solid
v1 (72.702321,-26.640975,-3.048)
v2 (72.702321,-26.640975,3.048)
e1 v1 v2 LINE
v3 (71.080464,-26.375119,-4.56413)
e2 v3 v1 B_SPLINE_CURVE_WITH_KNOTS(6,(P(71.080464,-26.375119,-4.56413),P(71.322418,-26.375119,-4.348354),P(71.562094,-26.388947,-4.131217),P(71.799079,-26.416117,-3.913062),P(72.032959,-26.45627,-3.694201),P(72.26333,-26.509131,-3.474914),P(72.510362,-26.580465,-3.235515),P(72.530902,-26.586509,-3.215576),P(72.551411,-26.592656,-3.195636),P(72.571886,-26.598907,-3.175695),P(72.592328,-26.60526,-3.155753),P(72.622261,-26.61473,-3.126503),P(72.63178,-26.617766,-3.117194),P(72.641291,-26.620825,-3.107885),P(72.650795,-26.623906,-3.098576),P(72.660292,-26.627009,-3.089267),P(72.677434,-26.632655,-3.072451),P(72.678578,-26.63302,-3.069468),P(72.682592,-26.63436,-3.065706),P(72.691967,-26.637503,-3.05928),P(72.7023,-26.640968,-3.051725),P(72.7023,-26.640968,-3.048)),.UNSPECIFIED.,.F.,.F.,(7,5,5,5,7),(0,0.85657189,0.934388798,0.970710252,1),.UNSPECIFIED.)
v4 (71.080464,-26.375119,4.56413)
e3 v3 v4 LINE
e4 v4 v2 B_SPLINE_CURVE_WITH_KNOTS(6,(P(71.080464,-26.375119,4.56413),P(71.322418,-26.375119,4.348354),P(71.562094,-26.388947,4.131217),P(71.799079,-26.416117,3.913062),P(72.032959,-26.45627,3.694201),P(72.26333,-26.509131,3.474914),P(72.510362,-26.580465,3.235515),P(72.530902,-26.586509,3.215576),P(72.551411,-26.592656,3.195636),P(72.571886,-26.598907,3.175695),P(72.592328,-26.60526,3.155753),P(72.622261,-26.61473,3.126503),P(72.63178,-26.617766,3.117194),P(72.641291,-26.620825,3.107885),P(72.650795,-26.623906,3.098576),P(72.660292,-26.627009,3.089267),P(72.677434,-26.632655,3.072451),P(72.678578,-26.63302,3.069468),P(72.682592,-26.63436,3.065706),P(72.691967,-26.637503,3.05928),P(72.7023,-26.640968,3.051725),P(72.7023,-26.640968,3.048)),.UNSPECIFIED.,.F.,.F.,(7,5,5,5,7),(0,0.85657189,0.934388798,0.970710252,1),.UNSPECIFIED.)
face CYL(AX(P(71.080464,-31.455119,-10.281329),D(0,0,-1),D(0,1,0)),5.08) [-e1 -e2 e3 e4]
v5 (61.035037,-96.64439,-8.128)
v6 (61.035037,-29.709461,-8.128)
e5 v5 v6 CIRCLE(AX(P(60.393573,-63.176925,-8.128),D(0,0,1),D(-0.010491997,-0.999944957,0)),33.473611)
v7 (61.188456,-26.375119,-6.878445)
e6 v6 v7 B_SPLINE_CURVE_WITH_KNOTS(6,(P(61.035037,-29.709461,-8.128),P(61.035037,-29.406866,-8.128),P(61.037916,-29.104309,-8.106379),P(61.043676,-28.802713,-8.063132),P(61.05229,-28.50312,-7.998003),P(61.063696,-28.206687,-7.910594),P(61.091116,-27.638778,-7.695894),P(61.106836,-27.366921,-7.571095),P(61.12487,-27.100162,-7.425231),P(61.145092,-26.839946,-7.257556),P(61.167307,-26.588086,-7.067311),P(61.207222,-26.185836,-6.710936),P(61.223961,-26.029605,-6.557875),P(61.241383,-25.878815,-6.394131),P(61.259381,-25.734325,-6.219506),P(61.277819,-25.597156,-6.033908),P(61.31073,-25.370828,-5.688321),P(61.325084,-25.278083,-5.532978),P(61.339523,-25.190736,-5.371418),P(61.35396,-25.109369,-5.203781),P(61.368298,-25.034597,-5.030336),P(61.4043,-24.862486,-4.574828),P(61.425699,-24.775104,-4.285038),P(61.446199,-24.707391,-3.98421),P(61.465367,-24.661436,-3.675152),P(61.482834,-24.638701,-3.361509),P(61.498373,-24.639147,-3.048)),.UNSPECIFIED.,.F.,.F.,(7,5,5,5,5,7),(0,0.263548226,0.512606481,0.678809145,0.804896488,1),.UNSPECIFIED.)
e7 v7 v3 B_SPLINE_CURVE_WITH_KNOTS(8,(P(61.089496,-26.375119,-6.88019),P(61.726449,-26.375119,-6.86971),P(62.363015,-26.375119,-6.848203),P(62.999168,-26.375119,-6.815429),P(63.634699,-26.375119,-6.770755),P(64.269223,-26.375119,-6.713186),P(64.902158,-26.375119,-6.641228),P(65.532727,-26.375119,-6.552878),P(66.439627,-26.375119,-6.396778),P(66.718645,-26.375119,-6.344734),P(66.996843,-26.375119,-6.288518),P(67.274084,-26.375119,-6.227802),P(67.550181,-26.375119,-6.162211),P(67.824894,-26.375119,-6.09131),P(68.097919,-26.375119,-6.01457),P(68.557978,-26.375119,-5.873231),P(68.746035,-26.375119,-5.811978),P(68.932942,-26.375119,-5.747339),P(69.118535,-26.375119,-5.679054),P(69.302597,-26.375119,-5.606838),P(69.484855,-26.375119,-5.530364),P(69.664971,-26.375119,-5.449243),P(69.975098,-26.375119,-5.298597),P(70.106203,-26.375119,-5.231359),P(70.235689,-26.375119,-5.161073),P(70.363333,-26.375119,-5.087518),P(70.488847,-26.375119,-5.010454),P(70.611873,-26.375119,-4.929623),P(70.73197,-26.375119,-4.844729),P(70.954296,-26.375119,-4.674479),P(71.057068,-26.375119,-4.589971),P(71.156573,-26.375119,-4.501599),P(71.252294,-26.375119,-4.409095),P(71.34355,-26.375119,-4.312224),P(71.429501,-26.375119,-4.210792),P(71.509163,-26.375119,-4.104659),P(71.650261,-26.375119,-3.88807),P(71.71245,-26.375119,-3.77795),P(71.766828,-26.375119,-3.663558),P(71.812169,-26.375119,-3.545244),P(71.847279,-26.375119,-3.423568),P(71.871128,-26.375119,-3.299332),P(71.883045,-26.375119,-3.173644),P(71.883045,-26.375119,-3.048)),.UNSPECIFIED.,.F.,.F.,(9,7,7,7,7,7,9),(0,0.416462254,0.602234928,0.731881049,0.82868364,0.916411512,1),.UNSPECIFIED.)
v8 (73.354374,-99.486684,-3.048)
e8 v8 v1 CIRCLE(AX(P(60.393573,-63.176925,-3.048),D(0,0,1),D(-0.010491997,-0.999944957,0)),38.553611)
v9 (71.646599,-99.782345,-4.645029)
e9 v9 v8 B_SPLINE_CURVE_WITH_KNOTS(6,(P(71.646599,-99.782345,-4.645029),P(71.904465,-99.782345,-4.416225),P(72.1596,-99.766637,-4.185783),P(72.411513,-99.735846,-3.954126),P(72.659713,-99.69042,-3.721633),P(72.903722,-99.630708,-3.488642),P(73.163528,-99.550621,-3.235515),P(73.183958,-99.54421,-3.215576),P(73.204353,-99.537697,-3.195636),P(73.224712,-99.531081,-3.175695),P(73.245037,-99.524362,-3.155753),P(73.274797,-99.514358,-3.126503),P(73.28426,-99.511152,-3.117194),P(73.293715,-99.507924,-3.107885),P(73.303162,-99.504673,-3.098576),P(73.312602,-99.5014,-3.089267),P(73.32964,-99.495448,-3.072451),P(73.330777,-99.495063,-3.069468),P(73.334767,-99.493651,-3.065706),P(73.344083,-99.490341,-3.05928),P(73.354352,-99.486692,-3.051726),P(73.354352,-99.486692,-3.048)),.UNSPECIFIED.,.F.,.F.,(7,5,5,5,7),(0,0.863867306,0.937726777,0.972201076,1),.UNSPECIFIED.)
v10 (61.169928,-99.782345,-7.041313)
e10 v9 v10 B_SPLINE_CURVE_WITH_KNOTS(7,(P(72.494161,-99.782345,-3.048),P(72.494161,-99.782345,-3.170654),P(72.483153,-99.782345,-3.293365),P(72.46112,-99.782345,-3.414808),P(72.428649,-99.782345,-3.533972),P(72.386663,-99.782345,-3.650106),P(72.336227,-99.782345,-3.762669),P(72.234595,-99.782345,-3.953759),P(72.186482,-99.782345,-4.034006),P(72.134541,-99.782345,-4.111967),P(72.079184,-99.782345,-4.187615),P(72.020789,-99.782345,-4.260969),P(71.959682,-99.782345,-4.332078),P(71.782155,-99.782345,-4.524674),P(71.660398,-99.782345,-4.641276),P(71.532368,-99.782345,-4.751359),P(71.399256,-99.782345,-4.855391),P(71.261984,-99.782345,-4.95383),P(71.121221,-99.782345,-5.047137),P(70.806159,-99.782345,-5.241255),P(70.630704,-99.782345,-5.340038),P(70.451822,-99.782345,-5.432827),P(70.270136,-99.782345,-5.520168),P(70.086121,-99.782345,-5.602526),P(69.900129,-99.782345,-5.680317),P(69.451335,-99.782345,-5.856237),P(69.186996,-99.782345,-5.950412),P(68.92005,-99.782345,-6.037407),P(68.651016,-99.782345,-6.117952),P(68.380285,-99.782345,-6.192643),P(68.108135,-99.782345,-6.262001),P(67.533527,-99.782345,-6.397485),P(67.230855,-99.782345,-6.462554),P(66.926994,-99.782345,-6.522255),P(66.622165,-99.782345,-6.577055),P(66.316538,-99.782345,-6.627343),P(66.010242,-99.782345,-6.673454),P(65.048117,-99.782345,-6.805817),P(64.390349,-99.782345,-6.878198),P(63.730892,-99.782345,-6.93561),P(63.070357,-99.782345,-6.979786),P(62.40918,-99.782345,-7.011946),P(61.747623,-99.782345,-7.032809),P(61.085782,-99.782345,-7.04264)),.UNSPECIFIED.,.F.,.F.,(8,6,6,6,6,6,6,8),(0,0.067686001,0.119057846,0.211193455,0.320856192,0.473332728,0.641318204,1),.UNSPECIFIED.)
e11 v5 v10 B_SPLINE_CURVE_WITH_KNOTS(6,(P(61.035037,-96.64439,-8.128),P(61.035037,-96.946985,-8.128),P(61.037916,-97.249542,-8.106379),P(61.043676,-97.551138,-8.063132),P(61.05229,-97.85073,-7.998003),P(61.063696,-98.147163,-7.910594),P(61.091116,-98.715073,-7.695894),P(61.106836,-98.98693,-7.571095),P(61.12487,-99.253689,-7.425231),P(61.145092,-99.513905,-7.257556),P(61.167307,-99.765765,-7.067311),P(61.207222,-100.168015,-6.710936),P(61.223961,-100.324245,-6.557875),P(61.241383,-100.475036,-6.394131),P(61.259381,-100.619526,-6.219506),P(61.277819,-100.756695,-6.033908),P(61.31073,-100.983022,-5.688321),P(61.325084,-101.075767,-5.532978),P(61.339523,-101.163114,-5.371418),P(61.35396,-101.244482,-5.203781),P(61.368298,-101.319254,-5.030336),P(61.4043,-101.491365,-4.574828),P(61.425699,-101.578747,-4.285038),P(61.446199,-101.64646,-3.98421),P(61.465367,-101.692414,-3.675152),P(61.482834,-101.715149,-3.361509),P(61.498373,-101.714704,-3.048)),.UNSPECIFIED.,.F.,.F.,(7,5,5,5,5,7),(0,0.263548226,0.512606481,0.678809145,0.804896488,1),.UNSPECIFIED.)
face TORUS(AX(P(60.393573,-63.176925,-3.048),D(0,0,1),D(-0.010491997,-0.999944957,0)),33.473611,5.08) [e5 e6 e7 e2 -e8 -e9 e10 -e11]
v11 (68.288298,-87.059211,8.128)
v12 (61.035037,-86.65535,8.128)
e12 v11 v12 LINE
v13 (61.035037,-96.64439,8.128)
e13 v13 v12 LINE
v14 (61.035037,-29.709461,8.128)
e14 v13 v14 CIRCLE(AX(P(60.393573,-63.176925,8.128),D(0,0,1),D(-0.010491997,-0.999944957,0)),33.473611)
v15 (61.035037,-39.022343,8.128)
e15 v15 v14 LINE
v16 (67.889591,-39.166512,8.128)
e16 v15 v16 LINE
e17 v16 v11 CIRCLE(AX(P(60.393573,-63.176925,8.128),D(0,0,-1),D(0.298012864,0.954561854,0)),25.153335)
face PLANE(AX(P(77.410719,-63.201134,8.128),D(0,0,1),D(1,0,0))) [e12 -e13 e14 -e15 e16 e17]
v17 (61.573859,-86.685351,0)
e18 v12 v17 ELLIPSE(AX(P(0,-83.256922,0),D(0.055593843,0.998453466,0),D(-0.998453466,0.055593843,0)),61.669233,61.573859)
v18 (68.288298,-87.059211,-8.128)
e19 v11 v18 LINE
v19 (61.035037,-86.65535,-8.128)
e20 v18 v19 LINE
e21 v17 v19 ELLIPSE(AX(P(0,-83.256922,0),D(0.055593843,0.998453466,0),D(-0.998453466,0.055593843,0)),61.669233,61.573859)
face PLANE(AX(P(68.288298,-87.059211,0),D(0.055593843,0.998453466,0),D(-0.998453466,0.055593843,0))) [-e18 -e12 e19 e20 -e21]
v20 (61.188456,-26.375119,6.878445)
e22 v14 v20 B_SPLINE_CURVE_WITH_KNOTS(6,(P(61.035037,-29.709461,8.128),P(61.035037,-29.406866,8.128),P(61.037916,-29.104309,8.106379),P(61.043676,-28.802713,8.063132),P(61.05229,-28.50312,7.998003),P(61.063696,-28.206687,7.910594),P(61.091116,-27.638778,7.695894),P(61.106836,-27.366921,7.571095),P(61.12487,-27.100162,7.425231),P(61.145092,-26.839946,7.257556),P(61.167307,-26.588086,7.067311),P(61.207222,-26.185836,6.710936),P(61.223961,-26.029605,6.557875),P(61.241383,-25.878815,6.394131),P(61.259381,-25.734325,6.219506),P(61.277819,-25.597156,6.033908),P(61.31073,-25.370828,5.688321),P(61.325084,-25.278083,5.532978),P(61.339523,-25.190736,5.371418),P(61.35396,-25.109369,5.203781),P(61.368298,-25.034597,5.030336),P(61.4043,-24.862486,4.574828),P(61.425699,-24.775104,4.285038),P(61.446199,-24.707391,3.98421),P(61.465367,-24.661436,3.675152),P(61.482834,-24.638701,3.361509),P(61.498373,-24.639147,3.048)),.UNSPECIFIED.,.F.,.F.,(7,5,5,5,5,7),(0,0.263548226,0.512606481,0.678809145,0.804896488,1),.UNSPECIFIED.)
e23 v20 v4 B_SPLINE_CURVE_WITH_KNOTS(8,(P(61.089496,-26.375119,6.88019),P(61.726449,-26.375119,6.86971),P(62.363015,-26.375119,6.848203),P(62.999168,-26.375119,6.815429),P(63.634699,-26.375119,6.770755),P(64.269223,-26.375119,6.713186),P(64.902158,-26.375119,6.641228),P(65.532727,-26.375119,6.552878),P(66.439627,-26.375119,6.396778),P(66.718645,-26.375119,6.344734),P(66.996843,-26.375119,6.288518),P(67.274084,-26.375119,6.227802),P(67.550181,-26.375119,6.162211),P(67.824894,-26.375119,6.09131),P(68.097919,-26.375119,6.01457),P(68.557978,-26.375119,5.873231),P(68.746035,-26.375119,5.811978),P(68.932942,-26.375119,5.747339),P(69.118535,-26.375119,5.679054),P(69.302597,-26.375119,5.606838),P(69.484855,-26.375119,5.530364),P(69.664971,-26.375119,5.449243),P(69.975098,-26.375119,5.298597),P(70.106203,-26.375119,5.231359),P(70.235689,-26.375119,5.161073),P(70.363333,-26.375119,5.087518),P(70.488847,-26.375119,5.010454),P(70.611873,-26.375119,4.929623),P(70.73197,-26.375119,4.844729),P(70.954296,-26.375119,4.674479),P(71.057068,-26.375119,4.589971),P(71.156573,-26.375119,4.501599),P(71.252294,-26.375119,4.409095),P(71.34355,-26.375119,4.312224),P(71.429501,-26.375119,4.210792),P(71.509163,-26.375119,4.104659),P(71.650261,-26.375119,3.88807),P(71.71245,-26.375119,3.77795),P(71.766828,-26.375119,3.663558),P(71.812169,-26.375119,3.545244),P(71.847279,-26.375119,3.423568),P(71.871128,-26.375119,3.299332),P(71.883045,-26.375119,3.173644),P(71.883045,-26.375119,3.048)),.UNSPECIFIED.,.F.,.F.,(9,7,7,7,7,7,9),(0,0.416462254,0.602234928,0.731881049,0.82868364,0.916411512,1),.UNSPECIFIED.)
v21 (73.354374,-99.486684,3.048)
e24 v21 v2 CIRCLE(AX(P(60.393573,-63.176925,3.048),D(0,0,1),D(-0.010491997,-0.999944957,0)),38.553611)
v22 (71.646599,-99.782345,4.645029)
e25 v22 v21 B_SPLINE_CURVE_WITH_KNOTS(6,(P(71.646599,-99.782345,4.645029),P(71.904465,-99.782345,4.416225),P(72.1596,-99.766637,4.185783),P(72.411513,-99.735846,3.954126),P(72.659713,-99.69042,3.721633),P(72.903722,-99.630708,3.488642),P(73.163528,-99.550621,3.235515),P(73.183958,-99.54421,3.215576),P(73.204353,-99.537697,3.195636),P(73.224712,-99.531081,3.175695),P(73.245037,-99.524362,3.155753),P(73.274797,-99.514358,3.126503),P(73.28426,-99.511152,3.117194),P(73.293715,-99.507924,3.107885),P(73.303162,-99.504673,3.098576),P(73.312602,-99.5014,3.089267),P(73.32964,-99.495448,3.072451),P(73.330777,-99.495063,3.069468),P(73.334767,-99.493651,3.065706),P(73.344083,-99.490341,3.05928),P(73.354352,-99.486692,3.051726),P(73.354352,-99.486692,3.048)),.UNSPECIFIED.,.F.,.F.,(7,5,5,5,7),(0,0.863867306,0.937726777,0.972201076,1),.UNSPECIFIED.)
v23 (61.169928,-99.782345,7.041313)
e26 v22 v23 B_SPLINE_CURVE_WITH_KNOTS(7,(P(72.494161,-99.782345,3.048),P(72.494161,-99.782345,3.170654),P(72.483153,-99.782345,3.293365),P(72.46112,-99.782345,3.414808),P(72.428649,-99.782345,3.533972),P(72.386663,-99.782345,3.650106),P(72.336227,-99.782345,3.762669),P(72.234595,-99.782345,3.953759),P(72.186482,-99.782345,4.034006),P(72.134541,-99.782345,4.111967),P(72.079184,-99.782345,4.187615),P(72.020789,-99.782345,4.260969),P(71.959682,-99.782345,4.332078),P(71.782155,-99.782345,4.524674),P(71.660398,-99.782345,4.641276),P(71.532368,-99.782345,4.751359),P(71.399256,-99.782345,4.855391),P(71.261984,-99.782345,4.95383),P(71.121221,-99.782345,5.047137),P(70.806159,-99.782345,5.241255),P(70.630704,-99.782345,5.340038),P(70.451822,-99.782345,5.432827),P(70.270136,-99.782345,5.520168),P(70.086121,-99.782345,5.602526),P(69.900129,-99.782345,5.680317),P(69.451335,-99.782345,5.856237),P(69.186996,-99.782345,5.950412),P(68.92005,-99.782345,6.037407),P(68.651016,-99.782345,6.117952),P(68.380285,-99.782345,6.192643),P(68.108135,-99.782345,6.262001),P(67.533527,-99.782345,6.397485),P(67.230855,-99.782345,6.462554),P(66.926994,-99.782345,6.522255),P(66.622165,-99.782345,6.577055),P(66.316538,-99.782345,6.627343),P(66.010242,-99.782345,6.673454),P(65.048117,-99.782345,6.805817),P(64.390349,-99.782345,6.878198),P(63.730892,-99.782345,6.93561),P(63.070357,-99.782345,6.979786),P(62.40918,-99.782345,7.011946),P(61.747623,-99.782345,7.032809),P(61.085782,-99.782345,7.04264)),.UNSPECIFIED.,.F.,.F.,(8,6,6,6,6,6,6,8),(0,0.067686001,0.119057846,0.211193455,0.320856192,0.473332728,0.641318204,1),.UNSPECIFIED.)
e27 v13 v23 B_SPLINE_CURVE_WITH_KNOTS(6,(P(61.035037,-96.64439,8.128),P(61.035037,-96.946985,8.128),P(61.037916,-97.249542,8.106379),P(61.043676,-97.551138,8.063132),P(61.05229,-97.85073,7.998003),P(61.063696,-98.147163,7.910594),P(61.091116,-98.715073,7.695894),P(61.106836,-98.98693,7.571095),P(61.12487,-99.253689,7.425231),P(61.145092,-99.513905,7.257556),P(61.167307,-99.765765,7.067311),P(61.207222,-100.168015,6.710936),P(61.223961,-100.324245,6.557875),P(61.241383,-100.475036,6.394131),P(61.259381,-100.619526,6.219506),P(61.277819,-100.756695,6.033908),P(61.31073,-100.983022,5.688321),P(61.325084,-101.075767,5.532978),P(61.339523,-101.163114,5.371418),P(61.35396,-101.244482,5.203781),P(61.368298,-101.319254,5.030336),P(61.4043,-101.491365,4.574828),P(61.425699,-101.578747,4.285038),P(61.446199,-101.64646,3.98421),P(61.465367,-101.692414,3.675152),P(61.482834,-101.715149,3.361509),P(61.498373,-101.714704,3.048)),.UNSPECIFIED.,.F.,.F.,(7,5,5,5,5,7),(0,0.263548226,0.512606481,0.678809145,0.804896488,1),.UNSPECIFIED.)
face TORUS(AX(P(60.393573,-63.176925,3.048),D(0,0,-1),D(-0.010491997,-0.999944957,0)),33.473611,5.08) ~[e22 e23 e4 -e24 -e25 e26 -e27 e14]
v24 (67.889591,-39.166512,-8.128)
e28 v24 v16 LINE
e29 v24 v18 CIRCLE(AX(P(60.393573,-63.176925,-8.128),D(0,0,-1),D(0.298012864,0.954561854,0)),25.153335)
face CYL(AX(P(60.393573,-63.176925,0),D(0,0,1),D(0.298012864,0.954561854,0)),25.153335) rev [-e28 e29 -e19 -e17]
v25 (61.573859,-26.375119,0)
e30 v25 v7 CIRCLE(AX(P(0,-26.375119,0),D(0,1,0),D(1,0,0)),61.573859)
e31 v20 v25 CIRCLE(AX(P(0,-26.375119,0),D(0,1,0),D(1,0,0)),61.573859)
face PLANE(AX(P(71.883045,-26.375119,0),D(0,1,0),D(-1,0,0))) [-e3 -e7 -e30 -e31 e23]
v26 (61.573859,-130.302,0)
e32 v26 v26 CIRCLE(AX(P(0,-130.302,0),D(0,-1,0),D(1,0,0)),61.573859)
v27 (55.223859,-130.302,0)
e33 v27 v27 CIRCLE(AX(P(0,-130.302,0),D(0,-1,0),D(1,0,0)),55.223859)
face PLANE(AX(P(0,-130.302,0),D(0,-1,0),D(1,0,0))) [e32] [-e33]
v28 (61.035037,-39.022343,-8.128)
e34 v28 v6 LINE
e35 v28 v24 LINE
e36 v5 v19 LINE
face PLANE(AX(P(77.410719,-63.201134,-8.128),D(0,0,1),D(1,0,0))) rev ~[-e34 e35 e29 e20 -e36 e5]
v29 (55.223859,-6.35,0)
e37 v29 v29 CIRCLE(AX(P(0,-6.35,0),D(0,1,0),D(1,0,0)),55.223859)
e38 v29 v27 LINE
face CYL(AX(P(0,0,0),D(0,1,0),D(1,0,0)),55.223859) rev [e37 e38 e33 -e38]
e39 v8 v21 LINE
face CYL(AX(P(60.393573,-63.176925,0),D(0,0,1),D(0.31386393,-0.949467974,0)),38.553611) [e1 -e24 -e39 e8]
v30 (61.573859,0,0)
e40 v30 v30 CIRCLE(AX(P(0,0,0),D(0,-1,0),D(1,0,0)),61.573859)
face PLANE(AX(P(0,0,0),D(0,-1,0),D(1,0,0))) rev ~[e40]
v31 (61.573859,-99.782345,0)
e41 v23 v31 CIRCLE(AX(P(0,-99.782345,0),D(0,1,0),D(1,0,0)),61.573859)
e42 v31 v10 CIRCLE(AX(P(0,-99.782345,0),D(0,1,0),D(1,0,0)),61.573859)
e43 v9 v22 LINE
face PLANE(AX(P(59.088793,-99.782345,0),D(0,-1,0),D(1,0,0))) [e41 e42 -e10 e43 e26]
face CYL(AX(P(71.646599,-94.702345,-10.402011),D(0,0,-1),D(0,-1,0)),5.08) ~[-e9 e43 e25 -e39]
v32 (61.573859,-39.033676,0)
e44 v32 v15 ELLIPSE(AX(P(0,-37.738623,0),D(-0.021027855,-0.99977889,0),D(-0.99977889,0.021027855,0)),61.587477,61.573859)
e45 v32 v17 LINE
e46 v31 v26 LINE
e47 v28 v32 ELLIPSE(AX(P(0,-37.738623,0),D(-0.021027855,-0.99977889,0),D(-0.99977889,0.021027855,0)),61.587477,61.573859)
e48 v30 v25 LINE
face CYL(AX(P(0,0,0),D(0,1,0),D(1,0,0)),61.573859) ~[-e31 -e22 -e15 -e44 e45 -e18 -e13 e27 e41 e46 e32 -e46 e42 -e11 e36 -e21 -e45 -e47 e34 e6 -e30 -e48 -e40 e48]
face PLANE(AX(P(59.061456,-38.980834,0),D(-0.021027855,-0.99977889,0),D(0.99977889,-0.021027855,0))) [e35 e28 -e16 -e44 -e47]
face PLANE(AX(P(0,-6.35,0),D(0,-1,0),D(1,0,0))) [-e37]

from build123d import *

# Parameters (mm, degrees)
F0_R         = 61.5738591245
F1_DEPTH     = 130.302
F2_T         = -6.35
F4_DEPTH     = 8.128
F5_T1_DEPTH  = 20.8040228352
F5_T3_DEPTH  = 20.562657233
F5_T8_ANGLE  = 182.1562701249
F5_S9_R      = 61.5738591245
F5_T10_DEPTH = 49
F5_T14_ANGLE = 182.1562701249
F5_S15_R     = 61.5738591245
F5_T16_DEPTH = 49


# Not quite as in the source:
# - a fillet or chamfer that OpenCascade refuses, or shapes differently, is made with other operations: its cross-section is extruded or revolved along the edge and cut away or added


with BuildPart() as f1:
    # F0 (on Front) → F1 (new body)
    with BuildSketch(Plane.XZ):
        Circle(F0_R)
    extrude(amount=F1_DEPTH)

    # F2
    f2_openings = [f1.faces().sort_by_distance(p)[0] for p in [
        (0, -130.302, 0),
    ]]
    offset(amount=F2_T, openings=f2_openings)

    # F3 (on Top) → F4 (join, symmetric)
    with BuildSketch(Plane.XY):
        with BuildLine():
            Line((59.0887926519, -99.7823445332), (72.4941612439, -99.7823445332))
            ThreePointArc((72.4941612439, -99.7823445332), (98.9458486723, -62.8559772667), (71.8830453985, -26.3751186382))
            Line((71.8830453985, -26.3751186382), (59.0614564717, -26.3751186382))
            Line((59.0614564717, -26.3751186382), (59.0614564717, -38.9808338419))
            Line((59.0614564717, -38.9808338419), (67.8895905633, -39.1665116223))
            ThreePointArc((67.8895905633, -39.1665116223), (85.5460362932, -62.9675308307), (68.2882977353, -87.0592109513))
            Line((68.2882977353, -87.0592109513), (59.0887926519, -86.546982936))
            Line((59.0887926519, -86.546982936), (59.0887926519, -99.7823445332))
        make_face()
    extrude(amount=F4_DEPTH, both=True)

    # F5: fillet of radius 5.08 on 4 edges, made by hand

    # F5_s2 → F5_t1 (cut)
    with BuildSketch(Plane.XY.offset(-10.4020114176)):
        with BuildLine():
            ThreePointArc((71.6465994249, -99.7823445332), (72.5131887158, -99.7078837649), (73.3543737137, -99.4866842973))
            ThreePointArc((73.3543737137, -99.4866842973), (72.925139457, -99.6370514033), (72.4941612439, -99.7823445332))
            Line((72.4941612439, -99.7823445332), (71.6465994249, -99.7823445332))
        make_face()
    extrude(amount=F5_T1_DEPTH, mode=Mode.SUBTRACT)

    # F5_s4 → F5_t3 (cut)
    with BuildSketch(Plane.XY.offset(-10.2813286165)):
        with BuildLine():
            ThreePointArc((71.0804640636, -26.3751186382), (71.9022151056, -26.4420232646), (72.7023208932, -26.6409748489))
            ThreePointArc((72.7023208932, -26.6409748489), (72.2934256102, -26.5057587291), (71.8830453985, -26.3751186382))
            Line((71.8830453985, -26.3751186382), (71.0804640636, -26.3751186382))
        make_face()
    extrude(amount=F5_T3_DEPTH, mode=Mode.SUBTRACT)


with BuildPart() as f5_tool6:
    # F5_s7 → F5_t8 (revolve)
    with BuildSketch(Plane(origin=(61.0497406785, -0.6405689566, 0), x_dir=(0, 0, 1), z_dir=(-0.9999449575, 0.010491997, 0))):
        with BuildLine():
            ThreePointArc((-8.128, -96.0134100137), (-6.6401024484, -99.6055124621), (-3.048, -101.0934100137))
            Line((-3.048, -101.0934100137), (-8.128, -101.0934100137))
            Line((-8.128, -101.0934100137), (-8.128, -96.0134100137))
        make_face()
    revolve(axis=Axis((60.393573296, -63.1769253215, -8.128), (0, 0, 1)), revolution_arc=F5_T8_ANGLE)

    # F5_s9 → F5_t10 (cut, symmetric)
    with BuildSketch(Plane.XZ.offset(63.2)):
        Circle(F5_S9_R)
    extrude(amount=F5_T10_DEPTH, both=True, mode=Mode.SUBTRACT)


with BuildPart() as f1_1:
    add(f1.part)

    # F5_t5: cut F5_tool6
    add(f5_tool6.part, mode=Mode.SUBTRACT)


with BuildPart() as f5_tool12:
    # F5_s13 → F5_t14 (revolve)
    with BuildSketch(Plane(origin=(61.0497406785, -0.6405689566, 0), x_dir=(0, 0, 1), z_dir=(-0.9999449575, 0.010491997, 0))):
        with BuildLine():
            ThreePointArc((8.128, -96.0134100137), (6.6401024484, -99.6055124621), (3.048, -101.0934100137))
            Line((3.048, -101.0934100137), (8.128, -101.0934100137))
            Line((8.128, -101.0934100137), (8.128, -96.0134100137))
        make_face()
    revolve(axis=Axis((60.393573296, -63.1769253215, 8.128), (0, 0, 1)), revolution_arc=F5_T14_ANGLE)

    # F5_s15 → F5_t16 (cut, symmetric)
    with BuildSketch(Plane.XZ.offset(63.2)):
        Circle(F5_S15_R)
    extrude(amount=F5_T16_DEPTH, both=True, mode=Mode.SUBTRACT)


with BuildPart() as f1_2:
    add(f1_1.part)

    # F5_t11: cut F5_tool12
    add(f5_tool12.part, mode=Mode.SUBTRACT)


solid = f1_2.part
